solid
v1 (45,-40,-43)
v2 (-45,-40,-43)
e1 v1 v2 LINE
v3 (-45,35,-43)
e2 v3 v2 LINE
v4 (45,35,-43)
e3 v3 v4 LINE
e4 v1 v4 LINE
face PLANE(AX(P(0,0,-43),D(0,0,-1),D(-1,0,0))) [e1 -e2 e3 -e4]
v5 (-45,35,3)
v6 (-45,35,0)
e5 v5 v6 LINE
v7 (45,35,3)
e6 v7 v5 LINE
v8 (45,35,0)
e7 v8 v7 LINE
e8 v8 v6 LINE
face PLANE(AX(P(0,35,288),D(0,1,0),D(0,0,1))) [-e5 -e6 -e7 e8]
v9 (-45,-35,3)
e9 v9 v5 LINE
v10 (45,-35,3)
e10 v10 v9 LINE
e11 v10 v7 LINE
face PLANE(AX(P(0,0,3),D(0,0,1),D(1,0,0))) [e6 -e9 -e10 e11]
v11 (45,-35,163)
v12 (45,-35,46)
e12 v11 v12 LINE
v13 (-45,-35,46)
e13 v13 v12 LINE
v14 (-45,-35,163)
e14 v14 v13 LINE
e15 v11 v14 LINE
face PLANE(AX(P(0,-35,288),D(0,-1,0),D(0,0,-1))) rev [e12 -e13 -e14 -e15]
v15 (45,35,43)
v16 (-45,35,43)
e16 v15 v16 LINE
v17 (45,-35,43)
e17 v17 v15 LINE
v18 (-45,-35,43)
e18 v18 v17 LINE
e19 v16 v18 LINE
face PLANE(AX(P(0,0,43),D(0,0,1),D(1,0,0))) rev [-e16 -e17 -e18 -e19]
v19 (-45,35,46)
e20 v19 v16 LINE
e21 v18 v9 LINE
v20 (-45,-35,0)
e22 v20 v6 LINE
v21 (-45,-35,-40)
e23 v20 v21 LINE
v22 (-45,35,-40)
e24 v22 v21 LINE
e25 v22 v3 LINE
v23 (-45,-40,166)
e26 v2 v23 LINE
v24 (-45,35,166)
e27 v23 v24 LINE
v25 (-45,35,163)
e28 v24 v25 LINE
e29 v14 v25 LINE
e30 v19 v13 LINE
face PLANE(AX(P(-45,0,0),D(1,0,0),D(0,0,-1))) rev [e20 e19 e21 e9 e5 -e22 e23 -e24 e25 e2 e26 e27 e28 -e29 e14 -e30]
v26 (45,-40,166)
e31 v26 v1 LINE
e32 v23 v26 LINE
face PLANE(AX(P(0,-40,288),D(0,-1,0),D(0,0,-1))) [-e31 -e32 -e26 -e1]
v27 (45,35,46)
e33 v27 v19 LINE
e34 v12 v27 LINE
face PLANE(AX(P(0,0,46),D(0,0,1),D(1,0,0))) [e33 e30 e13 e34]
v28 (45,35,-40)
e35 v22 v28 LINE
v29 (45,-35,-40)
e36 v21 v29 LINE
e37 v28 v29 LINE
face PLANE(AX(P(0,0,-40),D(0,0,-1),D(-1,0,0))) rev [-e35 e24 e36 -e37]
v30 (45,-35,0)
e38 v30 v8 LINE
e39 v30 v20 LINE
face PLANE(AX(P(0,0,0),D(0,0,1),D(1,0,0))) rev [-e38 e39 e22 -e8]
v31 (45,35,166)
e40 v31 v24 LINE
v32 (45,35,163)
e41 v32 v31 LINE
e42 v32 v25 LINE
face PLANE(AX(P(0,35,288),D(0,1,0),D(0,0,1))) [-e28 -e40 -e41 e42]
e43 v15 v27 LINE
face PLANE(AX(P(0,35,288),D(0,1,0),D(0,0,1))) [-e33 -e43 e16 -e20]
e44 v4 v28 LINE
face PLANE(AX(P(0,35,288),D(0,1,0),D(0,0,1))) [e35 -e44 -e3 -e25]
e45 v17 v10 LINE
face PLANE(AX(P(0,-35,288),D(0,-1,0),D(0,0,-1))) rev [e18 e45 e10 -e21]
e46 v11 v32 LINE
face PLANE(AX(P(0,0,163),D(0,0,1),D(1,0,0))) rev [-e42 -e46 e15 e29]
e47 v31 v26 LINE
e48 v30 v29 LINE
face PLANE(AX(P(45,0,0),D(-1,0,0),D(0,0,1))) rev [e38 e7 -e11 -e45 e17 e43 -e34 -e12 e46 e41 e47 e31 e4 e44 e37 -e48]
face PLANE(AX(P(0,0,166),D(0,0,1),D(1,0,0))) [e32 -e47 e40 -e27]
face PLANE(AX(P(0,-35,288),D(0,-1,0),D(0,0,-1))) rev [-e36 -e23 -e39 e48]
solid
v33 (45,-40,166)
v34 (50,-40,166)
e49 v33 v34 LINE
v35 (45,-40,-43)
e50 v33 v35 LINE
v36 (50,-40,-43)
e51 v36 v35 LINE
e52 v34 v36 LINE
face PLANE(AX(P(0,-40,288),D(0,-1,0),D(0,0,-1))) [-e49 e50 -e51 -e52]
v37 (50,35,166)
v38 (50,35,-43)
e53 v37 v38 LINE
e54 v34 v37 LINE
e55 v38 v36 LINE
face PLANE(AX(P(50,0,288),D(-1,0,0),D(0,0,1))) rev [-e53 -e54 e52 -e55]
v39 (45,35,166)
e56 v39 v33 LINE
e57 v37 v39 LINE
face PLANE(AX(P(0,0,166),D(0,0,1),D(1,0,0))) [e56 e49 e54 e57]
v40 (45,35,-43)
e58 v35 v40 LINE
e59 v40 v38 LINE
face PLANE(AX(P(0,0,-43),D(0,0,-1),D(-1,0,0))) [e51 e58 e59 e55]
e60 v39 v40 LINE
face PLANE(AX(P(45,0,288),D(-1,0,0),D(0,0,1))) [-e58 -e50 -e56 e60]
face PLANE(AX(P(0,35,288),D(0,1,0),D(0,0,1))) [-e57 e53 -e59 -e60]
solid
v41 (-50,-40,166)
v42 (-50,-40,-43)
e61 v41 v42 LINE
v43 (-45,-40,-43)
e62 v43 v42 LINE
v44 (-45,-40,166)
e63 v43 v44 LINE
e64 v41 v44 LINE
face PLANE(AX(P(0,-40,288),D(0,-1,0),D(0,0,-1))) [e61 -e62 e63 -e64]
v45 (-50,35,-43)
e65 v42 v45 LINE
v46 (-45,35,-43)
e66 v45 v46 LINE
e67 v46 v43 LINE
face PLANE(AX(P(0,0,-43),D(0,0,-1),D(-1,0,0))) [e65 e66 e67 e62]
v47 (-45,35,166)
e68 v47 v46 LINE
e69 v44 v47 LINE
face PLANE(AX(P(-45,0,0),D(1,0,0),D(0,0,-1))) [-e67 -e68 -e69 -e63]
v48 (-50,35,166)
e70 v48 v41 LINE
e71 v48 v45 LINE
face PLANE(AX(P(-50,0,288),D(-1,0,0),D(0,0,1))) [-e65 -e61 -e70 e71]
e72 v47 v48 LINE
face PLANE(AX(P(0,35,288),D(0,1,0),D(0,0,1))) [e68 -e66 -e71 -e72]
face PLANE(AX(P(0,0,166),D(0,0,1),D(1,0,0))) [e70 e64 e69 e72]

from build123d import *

# Parameters (mm, degrees)
BOSS_EXTRUDE2_DEPTH      = 163
BOSS_EXTRUDE2_DEPTH_BACK = 40
SKETCH1_3_W              = 90
SKETCH1_3_H              = 70
BOSS_EXTRUDE3_DEPTH      = 3
SKETCH2_W                = 90
SKETCH2_H                = 70
BOSS_EXTRUDE4_DEPTH      = 3
SKETCH4_W                = 100
SKETCH4_H                = 75
BOSS_EXTRUDE6_DEPTH      = 3
SKETCH6_W                = 100
SKETCH6_H                = 75
BOSS_EXTRUDE7_DEPTH      = 3
SPLIT1_START             = -50
SPLIT1_OUTLINE_W         = 75
SPLIT1_OUTLINE_H         = 209
SPLIT1_DEPTH             = 5
SPLIT1_2_OUTLINE_W       = 75
SPLIT1_2_OUTLINE_H       = 209
SPLIT1_2_DEPTH           = 5
SPLIT1_START_2           = 45
SPLIT1_3_OUTLINE_W       = 75
SPLIT1_3_OUTLINE_H       = 209
SPLIT1_3_DEPTH           = 5
SPLIT1_4_OUTLINE_W       = 75
SPLIT1_4_OUTLINE_H       = 209
SPLIT1_4_DEPTH           = 5


# Read off the part's stored shape, not the designer's step: Split1
with BuildPart() as part:
    # Sketch1 → Boss-Extrude2 (new, two sides: drawn at the far end of the back side and taken through both)
    with BuildSketch(Plane.XY.offset(-BOSS_EXTRUDE2_DEPTH_BACK)):
        Polygon((-45, -35), (-45, 35), (-50, 35), (-50, -40), (50, -40), (50, 35), (45, 35), (45, -35), align=None)
    extrude(amount=BOSS_EXTRUDE2_DEPTH + BOSS_EXTRUDE2_DEPTH_BACK)

    # Sketch1<3> → Boss-Extrude3 (add)
    with BuildSketch(Plane.XY):
        Rectangle(SKETCH1_3_W, SKETCH1_3_H)
    extrude(amount=BOSS_EXTRUDE3_DEPTH)

    # Sketch2 → Boss-Extrude4 (add)
    with BuildSketch(Plane.XY.offset(43)):
        Rectangle(SKETCH2_W, SKETCH2_H)
    extrude(amount=BOSS_EXTRUDE4_DEPTH)

    # Sketch4 → Boss-Extrude6 (add)
    with BuildSketch(Plane(origin=(0, 0, -40), x_dir=(-1, 0, 0), z_dir=(0, 0, -1))):
        with Locations((0, -2.5)):
            Rectangle(SKETCH4_W, SKETCH4_H)
    extrude(amount=BOSS_EXTRUDE6_DEPTH)

    # Sketch6 → Boss-Extrude7 (add)
    with BuildSketch(Plane.XY.offset(163)):
        with Locations((0, -2.5)):
            Rectangle(SKETCH6_W, SKETCH6_H)
    extrude(amount=BOSS_EXTRUDE7_DEPTH)

    # Split1 2 outline → Split1 2 (cut)
    with BuildSketch(Plane.YZ.offset(SPLIT1_START)):
        with Locations((-2.5, 61.5)):
            Rectangle(SPLIT1_2_OUTLINE_W, SPLIT1_2_OUTLINE_H)
    extrude(amount=SPLIT1_2_DEPTH, mode=Mode.SUBTRACT)

    # Split1 3 outline → Split1 3 (cut)
    with BuildSketch(Plane.YZ.offset(SPLIT1_START_2)):
        with Locations((-2.5, 61.5)):
            Rectangle(SPLIT1_3_OUTLINE_W, SPLIT1_3_OUTLINE_H)
    extrude(amount=SPLIT1_3_DEPTH, mode=Mode.SUBTRACT)


with BuildPart() as body_2:
    # Split1 outline → Split1 (new body)
    with BuildSketch(Plane.YZ.offset(SPLIT1_START)):
        with Locations((-2.5, 61.5)):
            Rectangle(SPLIT1_OUTLINE_W, SPLIT1_OUTLINE_H)
    extrude(amount=SPLIT1_DEPTH)


with BuildPart() as body_3:
    # Split1 4 outline → Split1 4 (new body)
    with BuildSketch(Plane.YZ.offset(SPLIT1_START_2)):
        with Locations((-2.5, 61.5)):
            Rectangle(SPLIT1_4_OUTLINE_W, SPLIT1_4_OUTLINE_H)
    extrude(amount=SPLIT1_4_DEPTH)


solid = Compound([part.part, body_2.part, body_3.part])
